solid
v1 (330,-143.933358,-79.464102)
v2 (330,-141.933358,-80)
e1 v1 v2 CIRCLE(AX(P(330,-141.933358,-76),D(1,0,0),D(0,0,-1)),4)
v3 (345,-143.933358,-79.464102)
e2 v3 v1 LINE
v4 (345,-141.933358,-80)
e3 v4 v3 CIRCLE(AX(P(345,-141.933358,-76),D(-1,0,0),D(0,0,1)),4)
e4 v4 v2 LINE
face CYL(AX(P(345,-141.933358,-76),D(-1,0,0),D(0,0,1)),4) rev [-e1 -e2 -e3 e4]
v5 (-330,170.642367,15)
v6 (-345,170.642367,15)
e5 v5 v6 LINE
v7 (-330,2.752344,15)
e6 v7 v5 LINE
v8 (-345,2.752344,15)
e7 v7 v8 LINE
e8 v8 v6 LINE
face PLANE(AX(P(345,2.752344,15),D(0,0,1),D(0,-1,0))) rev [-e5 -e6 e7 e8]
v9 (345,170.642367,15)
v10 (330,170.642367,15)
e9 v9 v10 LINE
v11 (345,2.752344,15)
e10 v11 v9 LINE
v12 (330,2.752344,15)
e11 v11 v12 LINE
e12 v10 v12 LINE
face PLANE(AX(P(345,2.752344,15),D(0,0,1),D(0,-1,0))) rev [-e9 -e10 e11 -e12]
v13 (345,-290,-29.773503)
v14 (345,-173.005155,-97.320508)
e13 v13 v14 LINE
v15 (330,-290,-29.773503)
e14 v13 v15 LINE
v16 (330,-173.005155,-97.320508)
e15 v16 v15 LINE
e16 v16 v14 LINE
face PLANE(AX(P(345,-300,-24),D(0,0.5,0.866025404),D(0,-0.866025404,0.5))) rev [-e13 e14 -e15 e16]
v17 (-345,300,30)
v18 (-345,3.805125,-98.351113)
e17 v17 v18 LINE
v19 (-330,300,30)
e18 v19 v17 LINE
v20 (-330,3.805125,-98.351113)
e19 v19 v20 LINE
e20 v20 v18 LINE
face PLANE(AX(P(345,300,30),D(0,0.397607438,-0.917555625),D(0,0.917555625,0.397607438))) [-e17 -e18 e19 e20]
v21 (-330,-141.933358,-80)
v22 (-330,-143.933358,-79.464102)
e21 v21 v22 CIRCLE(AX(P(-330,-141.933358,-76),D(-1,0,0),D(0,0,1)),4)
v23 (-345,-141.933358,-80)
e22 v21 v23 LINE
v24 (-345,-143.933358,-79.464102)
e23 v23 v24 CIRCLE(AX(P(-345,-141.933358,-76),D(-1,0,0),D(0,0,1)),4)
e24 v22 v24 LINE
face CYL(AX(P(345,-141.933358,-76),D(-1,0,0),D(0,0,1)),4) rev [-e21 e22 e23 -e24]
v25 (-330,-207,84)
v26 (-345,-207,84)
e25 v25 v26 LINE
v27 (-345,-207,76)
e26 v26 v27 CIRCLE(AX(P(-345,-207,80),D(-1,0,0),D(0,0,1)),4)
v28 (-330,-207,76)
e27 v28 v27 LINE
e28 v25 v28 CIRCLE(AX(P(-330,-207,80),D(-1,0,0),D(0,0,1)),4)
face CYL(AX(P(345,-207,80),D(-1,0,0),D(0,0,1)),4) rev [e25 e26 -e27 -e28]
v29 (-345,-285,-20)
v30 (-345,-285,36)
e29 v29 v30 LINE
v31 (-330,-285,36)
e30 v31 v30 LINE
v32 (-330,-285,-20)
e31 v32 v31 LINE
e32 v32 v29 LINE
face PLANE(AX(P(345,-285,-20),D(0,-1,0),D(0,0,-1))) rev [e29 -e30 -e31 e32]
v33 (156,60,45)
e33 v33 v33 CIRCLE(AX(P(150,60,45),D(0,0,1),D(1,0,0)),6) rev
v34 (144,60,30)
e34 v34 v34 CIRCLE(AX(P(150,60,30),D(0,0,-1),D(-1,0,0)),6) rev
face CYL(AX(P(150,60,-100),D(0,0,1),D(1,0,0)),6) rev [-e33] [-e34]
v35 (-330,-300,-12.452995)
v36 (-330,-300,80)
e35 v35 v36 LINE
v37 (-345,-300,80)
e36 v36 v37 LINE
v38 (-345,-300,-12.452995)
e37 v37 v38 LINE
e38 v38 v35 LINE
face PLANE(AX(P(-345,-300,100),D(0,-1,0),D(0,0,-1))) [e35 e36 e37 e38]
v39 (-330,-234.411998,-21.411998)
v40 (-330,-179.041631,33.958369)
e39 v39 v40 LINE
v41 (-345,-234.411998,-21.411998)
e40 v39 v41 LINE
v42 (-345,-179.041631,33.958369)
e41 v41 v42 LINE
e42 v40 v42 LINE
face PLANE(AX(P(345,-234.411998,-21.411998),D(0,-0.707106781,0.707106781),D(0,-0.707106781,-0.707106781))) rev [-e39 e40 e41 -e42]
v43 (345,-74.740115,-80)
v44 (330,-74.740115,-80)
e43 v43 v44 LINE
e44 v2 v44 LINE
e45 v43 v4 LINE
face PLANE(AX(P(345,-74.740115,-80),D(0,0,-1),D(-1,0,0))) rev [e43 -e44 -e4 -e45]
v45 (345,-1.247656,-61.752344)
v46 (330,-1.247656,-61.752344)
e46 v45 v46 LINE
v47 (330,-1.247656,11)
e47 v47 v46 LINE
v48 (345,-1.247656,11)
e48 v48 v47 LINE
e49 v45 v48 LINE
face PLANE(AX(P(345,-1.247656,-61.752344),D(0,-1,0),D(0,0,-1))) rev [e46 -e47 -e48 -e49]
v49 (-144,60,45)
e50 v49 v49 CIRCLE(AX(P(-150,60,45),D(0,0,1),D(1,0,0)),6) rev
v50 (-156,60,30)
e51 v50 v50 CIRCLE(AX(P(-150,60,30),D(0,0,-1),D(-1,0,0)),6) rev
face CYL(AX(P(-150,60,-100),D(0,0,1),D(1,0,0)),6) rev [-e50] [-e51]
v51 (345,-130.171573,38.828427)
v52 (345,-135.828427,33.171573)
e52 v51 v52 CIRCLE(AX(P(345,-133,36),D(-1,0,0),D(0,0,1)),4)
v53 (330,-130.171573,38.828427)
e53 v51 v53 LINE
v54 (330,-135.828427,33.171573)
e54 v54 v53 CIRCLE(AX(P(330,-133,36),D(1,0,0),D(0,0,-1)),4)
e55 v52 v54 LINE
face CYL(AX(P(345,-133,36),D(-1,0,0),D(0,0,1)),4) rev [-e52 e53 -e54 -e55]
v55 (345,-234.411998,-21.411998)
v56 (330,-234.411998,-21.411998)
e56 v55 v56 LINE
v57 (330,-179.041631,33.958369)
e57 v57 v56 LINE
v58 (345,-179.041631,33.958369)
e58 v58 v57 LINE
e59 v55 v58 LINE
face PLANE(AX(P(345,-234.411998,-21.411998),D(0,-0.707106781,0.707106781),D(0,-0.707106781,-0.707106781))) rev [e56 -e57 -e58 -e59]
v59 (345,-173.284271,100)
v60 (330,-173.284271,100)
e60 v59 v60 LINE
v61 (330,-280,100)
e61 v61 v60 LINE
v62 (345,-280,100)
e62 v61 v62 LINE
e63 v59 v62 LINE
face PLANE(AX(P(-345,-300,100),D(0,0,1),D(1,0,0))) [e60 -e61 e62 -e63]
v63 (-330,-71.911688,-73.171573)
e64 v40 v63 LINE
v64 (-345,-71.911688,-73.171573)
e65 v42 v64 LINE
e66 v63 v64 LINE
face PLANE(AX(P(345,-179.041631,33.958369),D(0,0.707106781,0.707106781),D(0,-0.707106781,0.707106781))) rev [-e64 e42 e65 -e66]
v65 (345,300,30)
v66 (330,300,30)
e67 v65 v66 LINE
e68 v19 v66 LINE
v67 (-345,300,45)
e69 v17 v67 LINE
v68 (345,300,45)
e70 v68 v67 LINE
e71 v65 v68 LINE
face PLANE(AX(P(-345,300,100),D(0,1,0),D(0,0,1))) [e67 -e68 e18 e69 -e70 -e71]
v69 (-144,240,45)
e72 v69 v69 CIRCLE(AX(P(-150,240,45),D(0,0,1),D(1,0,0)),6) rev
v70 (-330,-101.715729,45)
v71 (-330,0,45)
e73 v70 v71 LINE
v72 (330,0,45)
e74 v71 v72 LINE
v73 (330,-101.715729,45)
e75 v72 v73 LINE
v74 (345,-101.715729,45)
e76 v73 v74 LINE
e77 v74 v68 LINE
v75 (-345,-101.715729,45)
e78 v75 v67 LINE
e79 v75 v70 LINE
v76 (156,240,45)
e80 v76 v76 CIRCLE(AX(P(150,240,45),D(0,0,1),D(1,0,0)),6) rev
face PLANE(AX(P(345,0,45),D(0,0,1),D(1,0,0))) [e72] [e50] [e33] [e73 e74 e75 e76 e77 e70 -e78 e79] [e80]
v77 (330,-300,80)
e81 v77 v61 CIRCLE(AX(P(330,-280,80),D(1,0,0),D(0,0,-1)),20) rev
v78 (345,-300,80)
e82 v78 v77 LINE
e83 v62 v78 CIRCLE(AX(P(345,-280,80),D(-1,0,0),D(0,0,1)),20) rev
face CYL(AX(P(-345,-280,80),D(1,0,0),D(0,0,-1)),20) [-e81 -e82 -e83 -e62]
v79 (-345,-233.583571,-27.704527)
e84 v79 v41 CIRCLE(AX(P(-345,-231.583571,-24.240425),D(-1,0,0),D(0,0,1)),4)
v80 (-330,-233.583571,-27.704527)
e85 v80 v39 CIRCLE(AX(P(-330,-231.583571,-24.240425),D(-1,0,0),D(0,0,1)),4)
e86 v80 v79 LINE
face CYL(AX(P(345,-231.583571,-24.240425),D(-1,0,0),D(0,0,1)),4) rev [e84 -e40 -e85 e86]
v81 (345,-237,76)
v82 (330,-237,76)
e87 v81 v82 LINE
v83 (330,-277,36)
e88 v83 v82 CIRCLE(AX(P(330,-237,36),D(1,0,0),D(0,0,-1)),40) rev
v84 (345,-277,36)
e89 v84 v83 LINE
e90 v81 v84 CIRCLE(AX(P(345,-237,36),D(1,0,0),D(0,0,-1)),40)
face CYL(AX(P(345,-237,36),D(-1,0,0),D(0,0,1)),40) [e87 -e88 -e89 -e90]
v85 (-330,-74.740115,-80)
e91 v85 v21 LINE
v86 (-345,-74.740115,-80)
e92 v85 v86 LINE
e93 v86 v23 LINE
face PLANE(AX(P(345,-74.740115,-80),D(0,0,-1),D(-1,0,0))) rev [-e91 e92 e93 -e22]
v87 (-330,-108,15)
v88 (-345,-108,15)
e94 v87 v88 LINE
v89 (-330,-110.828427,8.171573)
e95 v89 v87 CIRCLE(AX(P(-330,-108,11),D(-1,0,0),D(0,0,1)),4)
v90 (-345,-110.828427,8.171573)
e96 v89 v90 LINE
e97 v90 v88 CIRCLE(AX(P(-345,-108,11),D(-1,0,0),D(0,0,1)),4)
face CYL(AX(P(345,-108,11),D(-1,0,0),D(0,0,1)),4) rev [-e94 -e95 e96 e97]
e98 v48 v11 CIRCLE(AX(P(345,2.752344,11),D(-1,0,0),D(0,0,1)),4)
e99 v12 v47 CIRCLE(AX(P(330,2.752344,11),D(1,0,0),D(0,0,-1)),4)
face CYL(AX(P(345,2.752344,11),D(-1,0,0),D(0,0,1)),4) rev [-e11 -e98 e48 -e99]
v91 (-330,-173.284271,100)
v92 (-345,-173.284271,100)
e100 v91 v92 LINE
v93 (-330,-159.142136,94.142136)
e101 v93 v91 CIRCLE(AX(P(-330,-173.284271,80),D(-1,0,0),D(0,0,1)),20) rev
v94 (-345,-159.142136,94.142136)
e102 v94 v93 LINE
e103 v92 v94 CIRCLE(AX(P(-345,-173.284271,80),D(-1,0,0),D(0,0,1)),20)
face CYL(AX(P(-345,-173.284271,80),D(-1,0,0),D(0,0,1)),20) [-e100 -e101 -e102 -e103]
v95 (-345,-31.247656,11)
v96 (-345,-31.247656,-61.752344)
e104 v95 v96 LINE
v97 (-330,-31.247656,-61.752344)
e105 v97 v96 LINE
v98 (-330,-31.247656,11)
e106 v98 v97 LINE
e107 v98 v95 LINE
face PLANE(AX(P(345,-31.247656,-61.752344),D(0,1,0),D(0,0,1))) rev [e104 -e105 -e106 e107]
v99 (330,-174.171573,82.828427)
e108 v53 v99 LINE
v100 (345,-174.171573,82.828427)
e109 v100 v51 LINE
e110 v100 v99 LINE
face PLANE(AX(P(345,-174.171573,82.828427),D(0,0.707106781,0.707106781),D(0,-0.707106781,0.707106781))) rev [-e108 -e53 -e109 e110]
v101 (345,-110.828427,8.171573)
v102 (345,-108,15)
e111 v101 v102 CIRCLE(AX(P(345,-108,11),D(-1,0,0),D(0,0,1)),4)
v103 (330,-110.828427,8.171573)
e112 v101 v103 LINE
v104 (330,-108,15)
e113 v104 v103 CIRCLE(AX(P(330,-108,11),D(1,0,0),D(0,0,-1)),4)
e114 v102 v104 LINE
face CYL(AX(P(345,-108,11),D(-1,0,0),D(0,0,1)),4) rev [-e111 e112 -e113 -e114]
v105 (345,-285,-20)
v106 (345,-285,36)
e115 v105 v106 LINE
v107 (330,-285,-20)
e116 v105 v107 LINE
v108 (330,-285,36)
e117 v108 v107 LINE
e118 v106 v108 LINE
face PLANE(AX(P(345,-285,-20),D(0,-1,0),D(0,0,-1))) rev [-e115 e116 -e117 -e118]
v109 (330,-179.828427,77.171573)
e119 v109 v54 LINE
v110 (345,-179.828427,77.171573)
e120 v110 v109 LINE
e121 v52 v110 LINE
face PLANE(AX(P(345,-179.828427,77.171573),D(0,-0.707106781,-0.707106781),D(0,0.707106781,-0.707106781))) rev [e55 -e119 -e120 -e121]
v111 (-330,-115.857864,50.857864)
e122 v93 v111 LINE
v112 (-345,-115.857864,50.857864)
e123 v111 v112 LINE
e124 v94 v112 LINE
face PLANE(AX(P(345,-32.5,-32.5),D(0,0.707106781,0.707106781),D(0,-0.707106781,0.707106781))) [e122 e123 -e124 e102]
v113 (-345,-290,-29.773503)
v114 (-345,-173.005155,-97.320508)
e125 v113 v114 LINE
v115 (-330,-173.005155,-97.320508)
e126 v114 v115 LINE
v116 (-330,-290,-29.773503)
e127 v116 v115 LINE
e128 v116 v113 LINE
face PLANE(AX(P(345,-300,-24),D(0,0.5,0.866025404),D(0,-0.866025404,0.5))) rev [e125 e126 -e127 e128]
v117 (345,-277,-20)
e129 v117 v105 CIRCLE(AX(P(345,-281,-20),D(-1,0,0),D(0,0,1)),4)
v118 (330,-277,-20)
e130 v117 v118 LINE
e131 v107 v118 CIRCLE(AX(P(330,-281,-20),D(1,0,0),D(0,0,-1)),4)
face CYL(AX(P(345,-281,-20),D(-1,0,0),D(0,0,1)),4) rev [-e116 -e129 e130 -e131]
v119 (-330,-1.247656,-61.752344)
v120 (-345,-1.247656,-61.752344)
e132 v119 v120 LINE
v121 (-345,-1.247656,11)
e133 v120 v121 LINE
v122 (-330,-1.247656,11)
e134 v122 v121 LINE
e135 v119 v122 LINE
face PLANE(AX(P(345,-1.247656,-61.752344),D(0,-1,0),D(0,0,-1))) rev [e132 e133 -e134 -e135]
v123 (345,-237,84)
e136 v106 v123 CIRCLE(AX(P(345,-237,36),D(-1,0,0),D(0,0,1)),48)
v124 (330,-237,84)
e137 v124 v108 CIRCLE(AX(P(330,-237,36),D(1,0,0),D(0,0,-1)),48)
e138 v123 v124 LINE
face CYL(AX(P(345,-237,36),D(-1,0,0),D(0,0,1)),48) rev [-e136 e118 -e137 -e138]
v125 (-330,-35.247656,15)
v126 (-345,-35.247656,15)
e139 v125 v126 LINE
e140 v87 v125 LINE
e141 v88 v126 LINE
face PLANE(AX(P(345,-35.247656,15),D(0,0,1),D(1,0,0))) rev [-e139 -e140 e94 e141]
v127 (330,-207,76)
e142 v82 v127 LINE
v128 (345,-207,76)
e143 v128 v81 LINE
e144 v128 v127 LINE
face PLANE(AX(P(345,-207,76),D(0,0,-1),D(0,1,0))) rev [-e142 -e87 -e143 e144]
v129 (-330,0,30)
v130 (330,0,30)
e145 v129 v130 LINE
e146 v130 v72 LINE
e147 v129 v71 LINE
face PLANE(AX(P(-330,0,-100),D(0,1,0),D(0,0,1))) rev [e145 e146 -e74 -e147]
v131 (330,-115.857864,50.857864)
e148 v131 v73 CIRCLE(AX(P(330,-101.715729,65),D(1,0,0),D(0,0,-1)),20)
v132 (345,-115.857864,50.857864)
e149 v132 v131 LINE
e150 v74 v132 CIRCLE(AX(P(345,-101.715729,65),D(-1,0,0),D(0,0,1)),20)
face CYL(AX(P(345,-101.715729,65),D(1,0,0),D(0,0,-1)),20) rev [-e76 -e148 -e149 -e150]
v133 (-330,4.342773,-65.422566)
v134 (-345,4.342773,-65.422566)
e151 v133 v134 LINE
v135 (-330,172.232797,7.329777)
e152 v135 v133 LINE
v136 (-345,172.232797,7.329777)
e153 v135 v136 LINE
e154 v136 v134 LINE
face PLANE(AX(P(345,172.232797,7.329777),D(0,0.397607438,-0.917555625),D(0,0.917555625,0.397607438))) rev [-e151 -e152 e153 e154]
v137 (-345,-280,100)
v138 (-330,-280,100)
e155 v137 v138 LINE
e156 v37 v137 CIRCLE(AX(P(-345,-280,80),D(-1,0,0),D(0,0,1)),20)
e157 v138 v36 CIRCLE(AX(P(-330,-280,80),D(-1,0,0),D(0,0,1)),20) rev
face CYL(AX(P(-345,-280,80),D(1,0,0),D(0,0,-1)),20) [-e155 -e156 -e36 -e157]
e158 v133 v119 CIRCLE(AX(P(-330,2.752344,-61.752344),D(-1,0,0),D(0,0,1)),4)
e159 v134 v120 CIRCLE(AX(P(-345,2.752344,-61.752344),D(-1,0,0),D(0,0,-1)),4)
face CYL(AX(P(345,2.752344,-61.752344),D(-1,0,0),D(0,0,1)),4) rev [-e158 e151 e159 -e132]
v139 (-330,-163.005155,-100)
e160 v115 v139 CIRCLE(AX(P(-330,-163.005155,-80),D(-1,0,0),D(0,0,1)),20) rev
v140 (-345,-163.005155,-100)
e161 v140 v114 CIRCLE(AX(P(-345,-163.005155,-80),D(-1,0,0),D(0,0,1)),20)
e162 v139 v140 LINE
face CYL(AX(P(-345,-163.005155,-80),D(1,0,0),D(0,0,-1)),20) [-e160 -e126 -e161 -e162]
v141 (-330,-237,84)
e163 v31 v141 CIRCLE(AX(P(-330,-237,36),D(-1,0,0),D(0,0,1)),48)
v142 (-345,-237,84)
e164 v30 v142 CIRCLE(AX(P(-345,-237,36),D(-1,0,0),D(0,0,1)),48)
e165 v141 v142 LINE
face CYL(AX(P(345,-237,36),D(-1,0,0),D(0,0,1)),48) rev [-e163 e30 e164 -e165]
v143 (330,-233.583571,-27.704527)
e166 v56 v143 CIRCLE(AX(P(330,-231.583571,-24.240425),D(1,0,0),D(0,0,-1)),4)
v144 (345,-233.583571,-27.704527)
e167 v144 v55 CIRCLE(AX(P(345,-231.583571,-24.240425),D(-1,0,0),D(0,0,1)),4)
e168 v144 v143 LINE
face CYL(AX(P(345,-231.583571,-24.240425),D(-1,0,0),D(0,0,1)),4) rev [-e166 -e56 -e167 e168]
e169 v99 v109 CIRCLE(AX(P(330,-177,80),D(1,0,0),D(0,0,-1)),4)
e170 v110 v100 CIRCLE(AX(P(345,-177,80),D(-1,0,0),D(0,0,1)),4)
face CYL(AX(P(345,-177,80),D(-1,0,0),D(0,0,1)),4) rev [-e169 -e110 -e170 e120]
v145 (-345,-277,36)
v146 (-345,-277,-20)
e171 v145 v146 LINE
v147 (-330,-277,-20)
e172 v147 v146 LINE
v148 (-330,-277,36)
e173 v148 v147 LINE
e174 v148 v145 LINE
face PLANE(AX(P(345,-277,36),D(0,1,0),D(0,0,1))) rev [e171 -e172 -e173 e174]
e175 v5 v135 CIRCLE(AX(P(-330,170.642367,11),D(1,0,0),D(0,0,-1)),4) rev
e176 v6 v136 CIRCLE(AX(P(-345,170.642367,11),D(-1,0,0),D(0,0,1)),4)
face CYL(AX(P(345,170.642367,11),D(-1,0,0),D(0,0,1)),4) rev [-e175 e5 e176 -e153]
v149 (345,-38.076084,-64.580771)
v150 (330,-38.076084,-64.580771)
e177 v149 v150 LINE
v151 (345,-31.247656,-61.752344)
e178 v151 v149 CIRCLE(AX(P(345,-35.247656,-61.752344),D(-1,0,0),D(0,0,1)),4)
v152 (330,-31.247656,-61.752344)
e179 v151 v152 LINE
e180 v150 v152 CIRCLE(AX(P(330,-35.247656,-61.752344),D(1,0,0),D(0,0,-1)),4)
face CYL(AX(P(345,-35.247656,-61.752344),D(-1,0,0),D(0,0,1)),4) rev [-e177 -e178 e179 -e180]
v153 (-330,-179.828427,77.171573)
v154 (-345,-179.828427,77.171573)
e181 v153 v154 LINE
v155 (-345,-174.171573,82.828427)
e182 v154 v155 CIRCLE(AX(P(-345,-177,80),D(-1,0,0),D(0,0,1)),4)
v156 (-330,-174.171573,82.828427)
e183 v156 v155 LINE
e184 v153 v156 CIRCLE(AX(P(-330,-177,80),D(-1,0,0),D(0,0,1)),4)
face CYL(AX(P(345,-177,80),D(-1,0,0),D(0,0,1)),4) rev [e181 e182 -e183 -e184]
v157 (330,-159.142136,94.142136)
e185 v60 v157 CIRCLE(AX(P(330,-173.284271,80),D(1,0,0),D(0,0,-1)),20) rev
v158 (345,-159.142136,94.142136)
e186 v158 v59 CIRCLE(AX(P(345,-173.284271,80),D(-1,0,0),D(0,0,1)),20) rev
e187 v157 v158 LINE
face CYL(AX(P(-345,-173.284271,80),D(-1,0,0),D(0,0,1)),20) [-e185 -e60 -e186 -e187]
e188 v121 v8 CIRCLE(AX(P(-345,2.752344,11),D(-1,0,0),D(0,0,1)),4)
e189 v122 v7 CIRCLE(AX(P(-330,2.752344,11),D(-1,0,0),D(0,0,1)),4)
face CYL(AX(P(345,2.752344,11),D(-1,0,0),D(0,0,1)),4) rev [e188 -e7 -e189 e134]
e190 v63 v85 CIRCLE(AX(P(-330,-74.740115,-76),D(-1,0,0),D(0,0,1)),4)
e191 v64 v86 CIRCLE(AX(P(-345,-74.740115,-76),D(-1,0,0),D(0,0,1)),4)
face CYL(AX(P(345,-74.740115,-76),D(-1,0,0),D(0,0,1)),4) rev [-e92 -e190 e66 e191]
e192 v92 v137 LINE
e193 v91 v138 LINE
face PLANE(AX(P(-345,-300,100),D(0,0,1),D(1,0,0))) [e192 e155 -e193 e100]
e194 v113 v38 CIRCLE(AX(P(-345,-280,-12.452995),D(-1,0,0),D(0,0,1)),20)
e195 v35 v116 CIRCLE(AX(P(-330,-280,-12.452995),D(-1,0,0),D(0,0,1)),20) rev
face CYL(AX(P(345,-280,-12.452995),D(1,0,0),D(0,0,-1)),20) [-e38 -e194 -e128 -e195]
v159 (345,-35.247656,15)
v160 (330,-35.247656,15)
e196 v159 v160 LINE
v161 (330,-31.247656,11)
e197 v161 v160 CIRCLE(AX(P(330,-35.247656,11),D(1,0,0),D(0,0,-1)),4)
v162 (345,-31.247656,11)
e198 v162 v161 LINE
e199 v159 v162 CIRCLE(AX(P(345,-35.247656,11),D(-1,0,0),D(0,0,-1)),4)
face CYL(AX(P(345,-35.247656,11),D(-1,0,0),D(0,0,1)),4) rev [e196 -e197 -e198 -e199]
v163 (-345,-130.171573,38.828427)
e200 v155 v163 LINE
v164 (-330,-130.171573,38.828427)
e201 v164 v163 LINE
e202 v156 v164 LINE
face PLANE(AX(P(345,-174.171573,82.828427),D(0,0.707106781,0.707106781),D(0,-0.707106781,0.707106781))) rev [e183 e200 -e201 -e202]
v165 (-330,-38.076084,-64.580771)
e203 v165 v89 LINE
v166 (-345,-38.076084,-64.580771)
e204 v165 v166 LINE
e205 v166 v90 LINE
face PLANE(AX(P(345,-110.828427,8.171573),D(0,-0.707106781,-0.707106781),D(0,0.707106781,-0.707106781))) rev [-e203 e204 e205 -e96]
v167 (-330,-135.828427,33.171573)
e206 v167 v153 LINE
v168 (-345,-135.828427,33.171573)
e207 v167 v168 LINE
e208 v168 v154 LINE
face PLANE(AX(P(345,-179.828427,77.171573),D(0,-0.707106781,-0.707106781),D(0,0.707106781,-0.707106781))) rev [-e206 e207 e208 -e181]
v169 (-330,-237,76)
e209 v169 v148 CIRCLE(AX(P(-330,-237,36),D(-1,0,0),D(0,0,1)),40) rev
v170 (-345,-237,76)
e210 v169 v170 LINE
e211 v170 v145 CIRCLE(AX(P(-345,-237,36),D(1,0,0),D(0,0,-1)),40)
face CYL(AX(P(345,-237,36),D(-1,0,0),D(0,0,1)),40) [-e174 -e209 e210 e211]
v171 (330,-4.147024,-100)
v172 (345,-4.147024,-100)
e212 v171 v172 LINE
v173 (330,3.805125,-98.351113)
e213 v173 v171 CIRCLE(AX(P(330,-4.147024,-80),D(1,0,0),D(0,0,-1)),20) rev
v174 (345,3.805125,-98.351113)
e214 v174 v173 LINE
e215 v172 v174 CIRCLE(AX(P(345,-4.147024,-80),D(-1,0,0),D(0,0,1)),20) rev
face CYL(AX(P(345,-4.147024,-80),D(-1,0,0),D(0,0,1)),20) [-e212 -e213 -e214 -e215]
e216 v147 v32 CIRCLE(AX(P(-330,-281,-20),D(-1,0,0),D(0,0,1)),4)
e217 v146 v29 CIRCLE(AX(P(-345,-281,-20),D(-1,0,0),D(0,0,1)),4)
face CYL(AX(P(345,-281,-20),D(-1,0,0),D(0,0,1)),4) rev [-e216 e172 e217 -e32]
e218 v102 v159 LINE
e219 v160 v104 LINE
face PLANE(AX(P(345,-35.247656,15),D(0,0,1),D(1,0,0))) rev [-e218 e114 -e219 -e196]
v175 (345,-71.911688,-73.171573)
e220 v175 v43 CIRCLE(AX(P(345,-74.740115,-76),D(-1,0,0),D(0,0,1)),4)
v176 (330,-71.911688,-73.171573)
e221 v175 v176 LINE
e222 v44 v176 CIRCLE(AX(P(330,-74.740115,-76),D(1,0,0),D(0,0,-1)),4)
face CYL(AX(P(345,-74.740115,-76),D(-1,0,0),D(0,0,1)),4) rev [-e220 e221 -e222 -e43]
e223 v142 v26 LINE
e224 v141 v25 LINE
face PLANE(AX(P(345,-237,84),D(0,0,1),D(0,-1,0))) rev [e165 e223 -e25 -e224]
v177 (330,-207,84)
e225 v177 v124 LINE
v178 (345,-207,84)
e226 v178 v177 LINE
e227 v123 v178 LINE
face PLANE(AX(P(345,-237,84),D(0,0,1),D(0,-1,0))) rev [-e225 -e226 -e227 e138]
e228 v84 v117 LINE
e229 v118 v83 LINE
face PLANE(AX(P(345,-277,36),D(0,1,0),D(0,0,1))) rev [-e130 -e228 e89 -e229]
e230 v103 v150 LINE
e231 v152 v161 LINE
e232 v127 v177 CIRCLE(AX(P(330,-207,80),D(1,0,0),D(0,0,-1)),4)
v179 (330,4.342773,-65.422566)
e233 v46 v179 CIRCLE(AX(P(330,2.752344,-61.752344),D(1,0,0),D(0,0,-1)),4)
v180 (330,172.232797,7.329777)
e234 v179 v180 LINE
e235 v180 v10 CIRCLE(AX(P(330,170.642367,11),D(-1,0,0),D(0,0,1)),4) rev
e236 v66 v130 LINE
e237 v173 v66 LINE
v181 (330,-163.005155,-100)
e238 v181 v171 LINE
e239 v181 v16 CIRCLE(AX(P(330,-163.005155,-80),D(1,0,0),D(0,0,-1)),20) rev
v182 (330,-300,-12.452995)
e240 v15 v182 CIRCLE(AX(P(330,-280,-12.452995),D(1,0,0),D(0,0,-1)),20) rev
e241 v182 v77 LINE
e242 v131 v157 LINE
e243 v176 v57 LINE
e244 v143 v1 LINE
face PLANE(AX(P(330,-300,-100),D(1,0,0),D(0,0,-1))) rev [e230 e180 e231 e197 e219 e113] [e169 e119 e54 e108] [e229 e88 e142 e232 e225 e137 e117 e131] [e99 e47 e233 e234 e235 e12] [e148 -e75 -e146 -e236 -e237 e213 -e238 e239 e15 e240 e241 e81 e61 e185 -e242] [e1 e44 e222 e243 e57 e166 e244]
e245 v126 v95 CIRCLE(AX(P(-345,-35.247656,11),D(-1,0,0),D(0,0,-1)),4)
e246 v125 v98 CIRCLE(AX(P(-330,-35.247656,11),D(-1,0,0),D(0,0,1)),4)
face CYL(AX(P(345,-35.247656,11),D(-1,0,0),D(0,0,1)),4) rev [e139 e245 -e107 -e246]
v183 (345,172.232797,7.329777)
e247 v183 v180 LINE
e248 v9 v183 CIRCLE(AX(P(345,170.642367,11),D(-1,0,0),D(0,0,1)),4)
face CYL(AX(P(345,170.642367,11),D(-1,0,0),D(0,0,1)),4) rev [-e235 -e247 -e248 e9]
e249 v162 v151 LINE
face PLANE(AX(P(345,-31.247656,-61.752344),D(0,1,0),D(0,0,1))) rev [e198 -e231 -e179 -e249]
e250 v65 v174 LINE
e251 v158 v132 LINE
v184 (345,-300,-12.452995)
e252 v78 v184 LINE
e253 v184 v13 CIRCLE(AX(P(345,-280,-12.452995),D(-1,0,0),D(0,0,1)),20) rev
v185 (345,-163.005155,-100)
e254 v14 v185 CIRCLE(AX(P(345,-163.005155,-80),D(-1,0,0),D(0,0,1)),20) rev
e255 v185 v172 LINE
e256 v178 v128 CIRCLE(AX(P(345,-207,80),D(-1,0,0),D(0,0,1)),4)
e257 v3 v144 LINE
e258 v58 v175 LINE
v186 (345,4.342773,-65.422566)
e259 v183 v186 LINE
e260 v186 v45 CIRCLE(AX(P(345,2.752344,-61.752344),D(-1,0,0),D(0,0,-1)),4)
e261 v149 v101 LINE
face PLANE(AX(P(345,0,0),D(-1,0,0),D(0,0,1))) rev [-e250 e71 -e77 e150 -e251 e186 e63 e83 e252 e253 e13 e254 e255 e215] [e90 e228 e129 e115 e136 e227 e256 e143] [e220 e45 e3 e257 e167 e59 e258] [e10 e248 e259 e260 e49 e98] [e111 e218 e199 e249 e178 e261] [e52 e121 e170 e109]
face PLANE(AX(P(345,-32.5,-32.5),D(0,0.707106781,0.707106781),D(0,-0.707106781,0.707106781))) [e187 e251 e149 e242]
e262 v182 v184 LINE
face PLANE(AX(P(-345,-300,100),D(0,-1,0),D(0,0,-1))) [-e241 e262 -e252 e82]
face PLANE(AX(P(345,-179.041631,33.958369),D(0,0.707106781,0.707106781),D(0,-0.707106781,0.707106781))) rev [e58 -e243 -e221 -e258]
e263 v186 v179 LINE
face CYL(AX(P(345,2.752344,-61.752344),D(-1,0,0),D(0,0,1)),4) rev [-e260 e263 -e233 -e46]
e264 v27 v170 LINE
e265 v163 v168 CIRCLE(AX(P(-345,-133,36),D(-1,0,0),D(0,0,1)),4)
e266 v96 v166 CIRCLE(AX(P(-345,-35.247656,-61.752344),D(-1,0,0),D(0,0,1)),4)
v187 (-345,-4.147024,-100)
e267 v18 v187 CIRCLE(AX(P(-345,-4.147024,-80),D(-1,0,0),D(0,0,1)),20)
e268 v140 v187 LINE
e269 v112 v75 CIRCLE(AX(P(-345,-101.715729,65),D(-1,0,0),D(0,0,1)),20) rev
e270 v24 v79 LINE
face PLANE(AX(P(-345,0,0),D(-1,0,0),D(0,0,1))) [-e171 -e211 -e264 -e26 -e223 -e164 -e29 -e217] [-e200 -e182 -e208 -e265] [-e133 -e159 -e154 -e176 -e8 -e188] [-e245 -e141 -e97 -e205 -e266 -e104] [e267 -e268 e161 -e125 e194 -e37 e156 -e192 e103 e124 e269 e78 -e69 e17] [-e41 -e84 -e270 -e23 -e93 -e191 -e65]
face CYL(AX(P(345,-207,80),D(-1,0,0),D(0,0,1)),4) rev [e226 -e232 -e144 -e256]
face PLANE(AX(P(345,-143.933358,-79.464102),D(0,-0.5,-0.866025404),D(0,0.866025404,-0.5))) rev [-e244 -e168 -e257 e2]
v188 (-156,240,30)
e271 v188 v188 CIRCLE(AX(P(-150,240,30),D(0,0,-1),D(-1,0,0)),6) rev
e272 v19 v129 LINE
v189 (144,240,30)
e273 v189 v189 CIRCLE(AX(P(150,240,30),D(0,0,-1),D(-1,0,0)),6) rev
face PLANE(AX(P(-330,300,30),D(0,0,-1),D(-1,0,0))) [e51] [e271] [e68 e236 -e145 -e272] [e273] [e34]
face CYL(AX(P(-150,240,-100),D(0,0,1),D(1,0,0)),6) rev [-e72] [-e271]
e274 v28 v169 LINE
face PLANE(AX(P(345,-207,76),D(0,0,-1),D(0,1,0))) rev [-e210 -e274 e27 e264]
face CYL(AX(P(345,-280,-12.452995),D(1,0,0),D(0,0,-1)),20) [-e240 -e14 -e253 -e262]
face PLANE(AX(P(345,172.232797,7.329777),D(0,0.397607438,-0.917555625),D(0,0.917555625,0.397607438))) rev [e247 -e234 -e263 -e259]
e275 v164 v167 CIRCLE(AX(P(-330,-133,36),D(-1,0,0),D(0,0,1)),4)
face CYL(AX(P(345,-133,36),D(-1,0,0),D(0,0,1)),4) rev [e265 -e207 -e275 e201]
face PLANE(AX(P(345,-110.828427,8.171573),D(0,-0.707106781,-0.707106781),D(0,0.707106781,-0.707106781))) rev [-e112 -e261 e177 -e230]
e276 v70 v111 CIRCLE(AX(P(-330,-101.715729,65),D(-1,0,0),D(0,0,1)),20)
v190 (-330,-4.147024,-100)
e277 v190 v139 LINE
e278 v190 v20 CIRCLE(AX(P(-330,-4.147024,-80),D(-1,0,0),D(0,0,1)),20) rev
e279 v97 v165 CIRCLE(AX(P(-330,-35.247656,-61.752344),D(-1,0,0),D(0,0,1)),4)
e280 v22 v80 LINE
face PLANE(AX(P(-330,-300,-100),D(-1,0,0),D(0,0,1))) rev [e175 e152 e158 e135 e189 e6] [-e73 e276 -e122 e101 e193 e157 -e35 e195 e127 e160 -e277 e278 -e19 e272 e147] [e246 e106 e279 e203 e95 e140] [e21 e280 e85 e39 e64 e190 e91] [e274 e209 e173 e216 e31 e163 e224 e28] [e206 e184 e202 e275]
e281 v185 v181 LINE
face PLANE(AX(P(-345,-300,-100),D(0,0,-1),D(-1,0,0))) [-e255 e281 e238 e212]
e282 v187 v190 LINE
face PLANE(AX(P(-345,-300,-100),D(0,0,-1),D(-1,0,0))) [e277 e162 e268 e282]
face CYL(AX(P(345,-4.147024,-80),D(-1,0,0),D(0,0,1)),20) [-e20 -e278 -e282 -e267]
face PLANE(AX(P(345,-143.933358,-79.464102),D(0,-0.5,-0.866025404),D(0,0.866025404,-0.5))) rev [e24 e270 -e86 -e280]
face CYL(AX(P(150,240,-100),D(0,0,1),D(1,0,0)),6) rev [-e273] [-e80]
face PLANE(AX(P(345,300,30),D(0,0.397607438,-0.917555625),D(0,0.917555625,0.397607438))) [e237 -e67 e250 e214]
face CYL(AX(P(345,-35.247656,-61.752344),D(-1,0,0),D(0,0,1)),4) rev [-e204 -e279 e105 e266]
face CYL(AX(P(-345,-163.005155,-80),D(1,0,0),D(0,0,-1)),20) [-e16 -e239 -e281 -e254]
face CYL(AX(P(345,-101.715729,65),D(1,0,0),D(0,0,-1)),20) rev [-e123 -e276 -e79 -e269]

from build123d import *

# Parameters (mm, degrees)
DODANIE_WYCI_GNI_CIE1_DEPTH      = 345
DODANIE_WYCI_GNI_CIE1_DEPTH_BACK = 345
SZKIC1_W                         = 200
SZKIC1_H                         = 600
SZKIC2_R                         = 6
SZKIC2_W                         = 660
SZKIC2_H                         = 300
WYTNIJ_WYCI_GNI_CIE1_DEPTH       = 500.024047517
WYTNIJ_WYCI_GNI_CIE2_DEPTH       = 760.012516366
WYTNIJ_WYCI_GNI_CIE3_DEPTH       = 760.012516366
SZKIC5_W                         = 660
SZKIC5_H                         = 130
WYTNIJ_WYCI_GNI_CIE5_DEPTH       = 469.001068375
ZAOKR_GLENIE1_R                  = 20
LUSTRO1_START                    = 330
LUSTRO1_DEPTH                    = 15
LUSTRO1_2_DEPTH                  = 15


# Read off the part's stored shape, not the designer's step: Lustro1
with BuildPart() as part:
    # Szkic1 → Dodanie-wyciągnięcie1 (new, two sides: drawn at the far end of the back side and taken through both)
    with BuildSketch(Plane(origin=(0, 0, 0), x_dir=(0, 0, -1), z_dir=(1, 0, 0)).offset(-DODANIE_WYCI_GNI_CIE1_DEPTH_BACK)):
        Rectangle(SZKIC1_W, SZKIC1_H)
    extrude(amount=DODANIE_WYCI_GNI_CIE1_DEPTH + DODANIE_WYCI_GNI_CIE1_DEPTH_BACK)

    # Szkic2 → Wytnij-wyciągnięcie1 (cut, through all)
    with BuildSketch(Plane.XY.offset(100)):
        with Locations((-150, 240)):
            Circle(SZKIC2_R)
        with Locations((-150, 60)):
            Circle(SZKIC2_R)
        with Locations((150, 60)):
            Circle(SZKIC2_R)
        with Locations((150, 240)):
            Circle(SZKIC2_R)
        with Locations((0, -150)):
            Rectangle(SZKIC2_W, SZKIC2_H)
    extrude(amount=-WYTNIJ_WYCI_GNI_CIE1_DEPTH, mode=Mode.SUBTRACT)

    # Szkic3 → Wytnij-wyciągnięcie2 (cut, through all)
    with BuildSketch(Plane.ZY.offset(345)):
        Polygon((45, -110), (100, -165), (100, 300), (45, 300), align=None)
        Polygon((30, 300), (-100, 0), (-100, 300), align=None)
    extrude(amount=-WYTNIJ_WYCI_GNI_CIE2_DEPTH, mode=Mode.SUBTRACT)

    # Szkic4 → Wytnij-wyciągnięcie3 (cut, through all)
    with BuildSketch(Plane.ZY.offset(345)):
        with BuildLine():
            Line((-20, -285), (36, -285))
            ThreePointArc((36, -285), (69.941125497, -270.941125497), (84, -237))
            Line((84, -237), (84, -207))
            ThreePointArc((84, -207), (80, -203), (76, -207))
            Line((76, -207), (76, -237))
            ThreePointArc((76, -237), (64.284271247, -265.284271247), (36, -277))
            Line((36, -277), (-20, -277))
            ThreePointArc((-20, -277), (-24, -281), (-20, -285))
        make_face()
        with BuildLine():
            Line((77.171572875, -179.828427125), (33.171572875, -135.828427125))
            ThreePointArc((33.171572875, -135.828427125), (33.171572875, -130.171572875), (38.828427125, -130.171572875))
            Line((38.828427125, -130.171572875), (82.828427125, -174.171572875))
            ThreePointArc((82.828427125, -174.171572875), (82.828427125, -179.828427125), (77.171572875, -179.828427125))
        make_face()
        with BuildLine():
            Line((8.171572875, -110.828427125), (-64.580770724, -38.076083526))
            ThreePointArc((-64.580770724, -38.076083526), (-65.447861729, -33.716922672), (-61.752343599, -31.247656401))
            Line((-61.752343599, -31.247656401), (11, -31.247656401))
            ThreePointArc((11, -31.247656401), (13.828427125, -32.419229276), (15, -35.247656401))
            Line((15, -35.247656401), (15, -108))
            ThreePointArc((15, -108), (12.530733729, -111.69551813), (8.171572875, -110.828427125))
        make_face()
        with BuildLine():
            Line((-61.752343599, -1.247656401), (11, -1.247656401))
            ThreePointArc((11, -1.247656401), (13.828427125, -0.076083526), (15, 2.752343599))
            Line((15, 2.752343599), (15, 170.642367288))
            ThreePointArc((15, 170.642367288), (11.812129914, 174.559055303), (7.329777499, 172.232797039))
            Line((7.329777499, 172.232797039), (-65.4225661, 4.342773349))
            ThreePointArc((-65.4225661, 4.342773349), (-65.096122823, 0.557089514), (-61.752343599, -1.247656401))
        make_face()
        with BuildLine():
            Line((33.95836944, -179.04163056), (-73.171572875, -71.911688245))
            ThreePointArc((-73.171572875, -71.911688245), (-77.530733729, -71.04459724), (-80, -74.74011537))
            Line((-80, -74.74011537), (-80, -141.933358006))
            ThreePointArc((-80, -141.933358006), (-79.863703305, -142.968634187), (-79.464101615, -143.933358006))
            Line((-79.464101615, -143.933358006), (-27.704526957, -233.583571092))
            ThreePointArc((-27.704526957, -233.583571092), (-24.762530111, -235.549350538), (-21.411998217, -234.411998217))
            Line((-21.411998217, -234.411998217), (33.95836944, -179.04163056))
        make_face()
        Polygon((-24, -300), (-100, -168.364138625), (-100, -300), align=None)
    extrude(amount=-WYTNIJ_WYCI_GNI_CIE3_DEPTH, mode=Mode.SUBTRACT)

    # Szkic5 → Wytnij-wyciągnięcie5 (cut, through all)
    with BuildSketch(Plane(origin=(0, 0, 0), x_dir=(1, 0, 0), z_dir=(0, 1, 0))):
        with Locations((0, 35)):
            Rectangle(SZKIC5_W, SZKIC5_H)
    extrude(amount=WYTNIJ_WYCI_GNI_CIE5_DEPTH, mode=Mode.SUBTRACT)

    # Zaokrąglenie1
    zaokr_glenie1_edges = [part.edges().sort_by_distance(p)[0] for p in [
        (-337.5, -300, -24),
        (-337.5, -168.364138625, -100),
        (-337.5, -110, 45),
        (-337.5, -165, 100),
        (-337.5, -300, 100),
        (-337.5, 0, -100),
    ]]
    fillet(zaokr_glenie1_edges, radius=ZAOKR_GLENIE1_R)

    # Lustro1 outline → Lustro1 (cut)
    with BuildSketch(Plane.YZ.offset(LUSTRO1_START)):
        with BuildLine():
            ThreePointArc((3.805124986, -98.351112506), (-0.086374196, -99.583440072), (-4.147023767, -100))
            Line((-4.147023767, -100), (0, -100))
            Line((0, -100), (3.805124986, -98.351112506))
        make_face()
        with BuildLine():
            ThreePointArc((-163.005154776, -100), (-168.181535678, -99.318516526), (-173.005154776, -97.320508076))
            Line((-173.005154776, -97.320508076), (-168.364138625, -100))
            Line((-168.364138625, -100), (-163.005154776, -100))
        make_face()
        with BuildLine():
            ThreePointArc((-290, -29.773502692), (-297.320508076, -22.452994616), (-300, -12.452994616))
            Line((-300, -12.452994616), (-300, -24))
            Line((-300, -24), (-290, -29.773502692))
        make_face()
        with BuildLine():
            ThreePointArc((-300, 80), (-294.142135624, 94.142135624), (-280, 100))
            Line((-280, 100), (-300, 100))
            Line((-300, 100), (-300, 80))
        make_face()
        with BuildLine():
            ThreePointArc((-173.284271247, 100), (-165.6306026, 98.47759065), (-159.142135624, 94.142135624))
            Line((-159.142135624, 94.142135624), (-165, 100))
            Line((-165, 100), (-173.284271247, 100))
        make_face()
    extrude(amount=LUSTRO1_DEPTH, mode=Mode.SUBTRACT)

    # Lustro1 2 outline → Lustro1 2 (add)
    with BuildSketch(Plane.YZ.offset(LUSTRO1_START)):
        with BuildLine():
            ThreePointArc((-101.715728753, 45), (-109.3693974, 46.52240935), (-115.857864376, 50.857864376))
            Line((-115.857864376, 50.857864376), (-110, 45))
            Line((-110, 45), (-101.715728753, 45))
        make_face()
    extrude(amount=LUSTRO1_2_DEPTH)


solid = part.part
